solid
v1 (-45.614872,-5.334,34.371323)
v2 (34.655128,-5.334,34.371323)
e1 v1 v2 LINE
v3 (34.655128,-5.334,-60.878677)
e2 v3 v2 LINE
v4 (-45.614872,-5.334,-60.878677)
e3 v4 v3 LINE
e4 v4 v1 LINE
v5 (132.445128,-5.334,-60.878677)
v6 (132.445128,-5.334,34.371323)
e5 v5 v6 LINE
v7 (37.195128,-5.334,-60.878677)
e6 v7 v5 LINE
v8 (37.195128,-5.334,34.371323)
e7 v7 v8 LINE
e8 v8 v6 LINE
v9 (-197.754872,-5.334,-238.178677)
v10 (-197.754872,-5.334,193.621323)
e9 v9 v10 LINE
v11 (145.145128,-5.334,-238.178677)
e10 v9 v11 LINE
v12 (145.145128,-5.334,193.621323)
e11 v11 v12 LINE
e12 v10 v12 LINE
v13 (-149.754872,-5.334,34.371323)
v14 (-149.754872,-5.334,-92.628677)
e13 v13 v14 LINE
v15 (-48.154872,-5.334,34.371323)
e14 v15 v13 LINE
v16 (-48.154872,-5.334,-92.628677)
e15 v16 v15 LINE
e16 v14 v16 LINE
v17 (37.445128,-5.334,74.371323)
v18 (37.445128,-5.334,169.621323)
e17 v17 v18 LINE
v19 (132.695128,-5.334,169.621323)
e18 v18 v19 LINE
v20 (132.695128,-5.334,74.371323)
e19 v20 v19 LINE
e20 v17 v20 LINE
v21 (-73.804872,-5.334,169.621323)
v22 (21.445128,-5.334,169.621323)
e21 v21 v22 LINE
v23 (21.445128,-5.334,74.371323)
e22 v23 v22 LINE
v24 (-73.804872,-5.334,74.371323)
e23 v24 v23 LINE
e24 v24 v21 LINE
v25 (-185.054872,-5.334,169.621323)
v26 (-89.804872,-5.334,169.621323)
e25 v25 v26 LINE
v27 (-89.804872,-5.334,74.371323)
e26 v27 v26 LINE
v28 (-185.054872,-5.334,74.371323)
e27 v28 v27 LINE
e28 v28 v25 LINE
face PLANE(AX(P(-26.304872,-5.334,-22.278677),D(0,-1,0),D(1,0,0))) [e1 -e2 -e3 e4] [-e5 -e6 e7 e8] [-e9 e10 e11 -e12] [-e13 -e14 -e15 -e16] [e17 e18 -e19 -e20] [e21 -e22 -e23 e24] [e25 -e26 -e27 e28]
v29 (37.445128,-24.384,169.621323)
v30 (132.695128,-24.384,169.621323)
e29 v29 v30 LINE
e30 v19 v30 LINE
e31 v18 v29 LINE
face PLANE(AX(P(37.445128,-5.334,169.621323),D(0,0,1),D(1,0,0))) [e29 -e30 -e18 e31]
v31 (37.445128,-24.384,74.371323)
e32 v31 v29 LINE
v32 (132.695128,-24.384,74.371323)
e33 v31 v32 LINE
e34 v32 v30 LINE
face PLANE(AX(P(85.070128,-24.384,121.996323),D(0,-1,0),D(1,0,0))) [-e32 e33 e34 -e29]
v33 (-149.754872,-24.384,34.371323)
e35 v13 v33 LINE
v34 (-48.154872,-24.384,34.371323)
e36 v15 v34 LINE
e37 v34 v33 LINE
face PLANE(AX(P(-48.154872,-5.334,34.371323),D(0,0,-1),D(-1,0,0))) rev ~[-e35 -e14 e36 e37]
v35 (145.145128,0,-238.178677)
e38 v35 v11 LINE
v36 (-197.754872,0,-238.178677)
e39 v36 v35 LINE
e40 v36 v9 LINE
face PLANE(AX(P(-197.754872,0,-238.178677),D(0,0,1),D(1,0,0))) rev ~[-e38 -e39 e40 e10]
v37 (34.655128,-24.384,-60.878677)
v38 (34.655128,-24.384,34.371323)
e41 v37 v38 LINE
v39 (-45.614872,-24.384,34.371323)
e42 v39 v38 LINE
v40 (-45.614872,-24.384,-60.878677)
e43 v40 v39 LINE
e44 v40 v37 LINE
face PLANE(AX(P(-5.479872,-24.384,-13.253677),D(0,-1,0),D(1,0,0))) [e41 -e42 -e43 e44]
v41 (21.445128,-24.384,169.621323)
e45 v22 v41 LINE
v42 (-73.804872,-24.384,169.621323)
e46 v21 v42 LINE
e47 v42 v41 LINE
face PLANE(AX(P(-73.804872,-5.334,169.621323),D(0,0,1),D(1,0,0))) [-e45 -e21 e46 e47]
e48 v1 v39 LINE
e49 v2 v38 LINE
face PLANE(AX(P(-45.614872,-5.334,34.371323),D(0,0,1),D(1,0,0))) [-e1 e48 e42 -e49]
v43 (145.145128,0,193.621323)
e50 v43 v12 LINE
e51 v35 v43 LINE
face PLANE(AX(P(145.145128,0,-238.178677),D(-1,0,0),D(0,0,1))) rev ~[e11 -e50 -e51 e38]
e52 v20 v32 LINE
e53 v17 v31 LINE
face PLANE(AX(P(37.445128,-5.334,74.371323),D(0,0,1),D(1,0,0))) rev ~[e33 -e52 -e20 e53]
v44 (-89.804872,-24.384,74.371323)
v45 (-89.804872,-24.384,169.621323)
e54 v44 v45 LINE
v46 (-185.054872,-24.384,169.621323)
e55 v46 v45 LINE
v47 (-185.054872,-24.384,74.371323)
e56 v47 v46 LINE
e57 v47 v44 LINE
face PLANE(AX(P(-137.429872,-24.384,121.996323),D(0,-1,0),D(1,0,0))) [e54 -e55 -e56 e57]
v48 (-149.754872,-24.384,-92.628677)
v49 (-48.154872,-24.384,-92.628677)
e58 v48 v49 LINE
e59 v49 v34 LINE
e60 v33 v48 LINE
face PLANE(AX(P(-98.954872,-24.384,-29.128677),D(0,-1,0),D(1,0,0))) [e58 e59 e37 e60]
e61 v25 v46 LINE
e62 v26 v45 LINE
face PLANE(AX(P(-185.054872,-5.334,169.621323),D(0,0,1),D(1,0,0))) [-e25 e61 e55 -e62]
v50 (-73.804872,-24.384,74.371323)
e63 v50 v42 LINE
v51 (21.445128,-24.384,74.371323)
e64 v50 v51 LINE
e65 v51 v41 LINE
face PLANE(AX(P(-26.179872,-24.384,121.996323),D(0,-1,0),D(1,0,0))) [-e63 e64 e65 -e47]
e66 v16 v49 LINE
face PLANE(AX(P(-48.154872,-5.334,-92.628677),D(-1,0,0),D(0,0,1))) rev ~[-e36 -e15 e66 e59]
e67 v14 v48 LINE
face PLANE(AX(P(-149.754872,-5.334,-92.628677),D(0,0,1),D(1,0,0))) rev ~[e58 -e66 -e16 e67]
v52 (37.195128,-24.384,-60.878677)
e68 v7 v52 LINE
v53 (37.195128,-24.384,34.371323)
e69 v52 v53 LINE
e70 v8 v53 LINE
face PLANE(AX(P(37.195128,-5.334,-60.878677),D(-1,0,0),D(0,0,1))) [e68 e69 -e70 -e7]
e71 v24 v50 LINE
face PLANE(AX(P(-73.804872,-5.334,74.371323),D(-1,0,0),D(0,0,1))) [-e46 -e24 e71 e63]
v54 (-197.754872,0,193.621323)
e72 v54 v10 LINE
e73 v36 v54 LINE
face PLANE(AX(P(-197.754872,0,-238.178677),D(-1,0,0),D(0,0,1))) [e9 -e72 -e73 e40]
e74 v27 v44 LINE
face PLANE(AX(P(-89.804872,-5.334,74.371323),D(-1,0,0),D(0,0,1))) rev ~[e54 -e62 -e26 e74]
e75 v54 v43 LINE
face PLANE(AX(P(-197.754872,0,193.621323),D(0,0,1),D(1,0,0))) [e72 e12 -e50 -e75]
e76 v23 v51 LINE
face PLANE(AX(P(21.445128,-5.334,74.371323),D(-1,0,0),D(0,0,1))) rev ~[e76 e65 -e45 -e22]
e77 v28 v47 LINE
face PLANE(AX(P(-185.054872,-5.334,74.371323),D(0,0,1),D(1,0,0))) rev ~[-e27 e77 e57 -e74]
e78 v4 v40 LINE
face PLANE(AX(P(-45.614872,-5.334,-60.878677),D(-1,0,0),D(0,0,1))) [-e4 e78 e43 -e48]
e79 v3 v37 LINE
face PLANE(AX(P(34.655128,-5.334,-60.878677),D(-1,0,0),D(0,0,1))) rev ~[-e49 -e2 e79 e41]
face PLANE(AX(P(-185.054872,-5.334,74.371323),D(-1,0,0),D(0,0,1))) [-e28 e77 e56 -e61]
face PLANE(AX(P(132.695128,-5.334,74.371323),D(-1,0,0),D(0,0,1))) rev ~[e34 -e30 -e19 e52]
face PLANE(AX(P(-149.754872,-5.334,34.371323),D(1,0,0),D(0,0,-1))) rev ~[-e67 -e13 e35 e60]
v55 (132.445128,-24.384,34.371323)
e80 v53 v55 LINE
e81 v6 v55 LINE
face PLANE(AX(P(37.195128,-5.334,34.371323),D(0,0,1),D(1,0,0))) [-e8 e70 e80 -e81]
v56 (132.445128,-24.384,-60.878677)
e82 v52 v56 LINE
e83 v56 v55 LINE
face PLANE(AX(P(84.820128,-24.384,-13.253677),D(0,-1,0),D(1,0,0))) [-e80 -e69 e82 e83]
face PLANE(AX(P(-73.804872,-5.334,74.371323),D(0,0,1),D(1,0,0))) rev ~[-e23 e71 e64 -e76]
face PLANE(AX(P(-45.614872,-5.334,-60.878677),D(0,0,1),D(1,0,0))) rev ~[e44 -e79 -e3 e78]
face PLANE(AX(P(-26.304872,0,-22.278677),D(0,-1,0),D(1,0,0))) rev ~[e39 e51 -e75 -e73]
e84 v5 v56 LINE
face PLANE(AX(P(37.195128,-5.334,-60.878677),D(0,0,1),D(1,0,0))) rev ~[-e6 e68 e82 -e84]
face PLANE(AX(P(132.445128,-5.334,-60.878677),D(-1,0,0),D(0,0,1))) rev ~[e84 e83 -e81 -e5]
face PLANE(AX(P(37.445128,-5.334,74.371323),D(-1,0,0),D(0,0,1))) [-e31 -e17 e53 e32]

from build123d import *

# Parameters (mm, degrees)
F0_W     = 342.9
F0_H     = 431.8
F1_DEPTH = 5.334
F2_W     = 95.25
F2_H     = 95.25
F2_W_2   = 80.27
F3_DEPTH = 19.05


# Not quite as in the source:
# - a feature names something its author has since deleted; it is built from what else it names


with BuildPart() as f1:
    # F0 (on Front) → F1 (new body)
    with BuildSketch(Plane.XZ):
        with Locations((-26.3048716933, -22.2786769863)):
            Rectangle(F0_W, F0_H)
    extrude(amount=F1_DEPTH)

    # F2 (on face) → F3 (join)
    with BuildSketch(Plane.XZ.offset(5.334)):
        with Locations((-137.4298716933, 121.9963230137)):
            Rectangle(F2_W, F2_H)
        with Locations((-26.1798716933, 121.9963230137)):
            Rectangle(F2_W, F2_H)
        with Locations((85.0701283067, 121.9963230137)):
            Rectangle(F2_W, F2_H)
        Polygon((-48.1548716933, 34.3713230137), (-149.7548716933, 34.3713230137), (-149.7548716933, -92.6286769863), (-48.1548716933, -92.6286769863), (-48.1548716933, -60.8786769863), align=None)
        with Locations((-5.4798716933, -13.2536769863)):
            Rectangle(F2_W_2, F2_H)
        with Locations((84.8201283067, -13.2536769863)):
            Rectangle(F2_W, F2_H)
    extrude(amount=F3_DEPTH)


solid = f1.part
